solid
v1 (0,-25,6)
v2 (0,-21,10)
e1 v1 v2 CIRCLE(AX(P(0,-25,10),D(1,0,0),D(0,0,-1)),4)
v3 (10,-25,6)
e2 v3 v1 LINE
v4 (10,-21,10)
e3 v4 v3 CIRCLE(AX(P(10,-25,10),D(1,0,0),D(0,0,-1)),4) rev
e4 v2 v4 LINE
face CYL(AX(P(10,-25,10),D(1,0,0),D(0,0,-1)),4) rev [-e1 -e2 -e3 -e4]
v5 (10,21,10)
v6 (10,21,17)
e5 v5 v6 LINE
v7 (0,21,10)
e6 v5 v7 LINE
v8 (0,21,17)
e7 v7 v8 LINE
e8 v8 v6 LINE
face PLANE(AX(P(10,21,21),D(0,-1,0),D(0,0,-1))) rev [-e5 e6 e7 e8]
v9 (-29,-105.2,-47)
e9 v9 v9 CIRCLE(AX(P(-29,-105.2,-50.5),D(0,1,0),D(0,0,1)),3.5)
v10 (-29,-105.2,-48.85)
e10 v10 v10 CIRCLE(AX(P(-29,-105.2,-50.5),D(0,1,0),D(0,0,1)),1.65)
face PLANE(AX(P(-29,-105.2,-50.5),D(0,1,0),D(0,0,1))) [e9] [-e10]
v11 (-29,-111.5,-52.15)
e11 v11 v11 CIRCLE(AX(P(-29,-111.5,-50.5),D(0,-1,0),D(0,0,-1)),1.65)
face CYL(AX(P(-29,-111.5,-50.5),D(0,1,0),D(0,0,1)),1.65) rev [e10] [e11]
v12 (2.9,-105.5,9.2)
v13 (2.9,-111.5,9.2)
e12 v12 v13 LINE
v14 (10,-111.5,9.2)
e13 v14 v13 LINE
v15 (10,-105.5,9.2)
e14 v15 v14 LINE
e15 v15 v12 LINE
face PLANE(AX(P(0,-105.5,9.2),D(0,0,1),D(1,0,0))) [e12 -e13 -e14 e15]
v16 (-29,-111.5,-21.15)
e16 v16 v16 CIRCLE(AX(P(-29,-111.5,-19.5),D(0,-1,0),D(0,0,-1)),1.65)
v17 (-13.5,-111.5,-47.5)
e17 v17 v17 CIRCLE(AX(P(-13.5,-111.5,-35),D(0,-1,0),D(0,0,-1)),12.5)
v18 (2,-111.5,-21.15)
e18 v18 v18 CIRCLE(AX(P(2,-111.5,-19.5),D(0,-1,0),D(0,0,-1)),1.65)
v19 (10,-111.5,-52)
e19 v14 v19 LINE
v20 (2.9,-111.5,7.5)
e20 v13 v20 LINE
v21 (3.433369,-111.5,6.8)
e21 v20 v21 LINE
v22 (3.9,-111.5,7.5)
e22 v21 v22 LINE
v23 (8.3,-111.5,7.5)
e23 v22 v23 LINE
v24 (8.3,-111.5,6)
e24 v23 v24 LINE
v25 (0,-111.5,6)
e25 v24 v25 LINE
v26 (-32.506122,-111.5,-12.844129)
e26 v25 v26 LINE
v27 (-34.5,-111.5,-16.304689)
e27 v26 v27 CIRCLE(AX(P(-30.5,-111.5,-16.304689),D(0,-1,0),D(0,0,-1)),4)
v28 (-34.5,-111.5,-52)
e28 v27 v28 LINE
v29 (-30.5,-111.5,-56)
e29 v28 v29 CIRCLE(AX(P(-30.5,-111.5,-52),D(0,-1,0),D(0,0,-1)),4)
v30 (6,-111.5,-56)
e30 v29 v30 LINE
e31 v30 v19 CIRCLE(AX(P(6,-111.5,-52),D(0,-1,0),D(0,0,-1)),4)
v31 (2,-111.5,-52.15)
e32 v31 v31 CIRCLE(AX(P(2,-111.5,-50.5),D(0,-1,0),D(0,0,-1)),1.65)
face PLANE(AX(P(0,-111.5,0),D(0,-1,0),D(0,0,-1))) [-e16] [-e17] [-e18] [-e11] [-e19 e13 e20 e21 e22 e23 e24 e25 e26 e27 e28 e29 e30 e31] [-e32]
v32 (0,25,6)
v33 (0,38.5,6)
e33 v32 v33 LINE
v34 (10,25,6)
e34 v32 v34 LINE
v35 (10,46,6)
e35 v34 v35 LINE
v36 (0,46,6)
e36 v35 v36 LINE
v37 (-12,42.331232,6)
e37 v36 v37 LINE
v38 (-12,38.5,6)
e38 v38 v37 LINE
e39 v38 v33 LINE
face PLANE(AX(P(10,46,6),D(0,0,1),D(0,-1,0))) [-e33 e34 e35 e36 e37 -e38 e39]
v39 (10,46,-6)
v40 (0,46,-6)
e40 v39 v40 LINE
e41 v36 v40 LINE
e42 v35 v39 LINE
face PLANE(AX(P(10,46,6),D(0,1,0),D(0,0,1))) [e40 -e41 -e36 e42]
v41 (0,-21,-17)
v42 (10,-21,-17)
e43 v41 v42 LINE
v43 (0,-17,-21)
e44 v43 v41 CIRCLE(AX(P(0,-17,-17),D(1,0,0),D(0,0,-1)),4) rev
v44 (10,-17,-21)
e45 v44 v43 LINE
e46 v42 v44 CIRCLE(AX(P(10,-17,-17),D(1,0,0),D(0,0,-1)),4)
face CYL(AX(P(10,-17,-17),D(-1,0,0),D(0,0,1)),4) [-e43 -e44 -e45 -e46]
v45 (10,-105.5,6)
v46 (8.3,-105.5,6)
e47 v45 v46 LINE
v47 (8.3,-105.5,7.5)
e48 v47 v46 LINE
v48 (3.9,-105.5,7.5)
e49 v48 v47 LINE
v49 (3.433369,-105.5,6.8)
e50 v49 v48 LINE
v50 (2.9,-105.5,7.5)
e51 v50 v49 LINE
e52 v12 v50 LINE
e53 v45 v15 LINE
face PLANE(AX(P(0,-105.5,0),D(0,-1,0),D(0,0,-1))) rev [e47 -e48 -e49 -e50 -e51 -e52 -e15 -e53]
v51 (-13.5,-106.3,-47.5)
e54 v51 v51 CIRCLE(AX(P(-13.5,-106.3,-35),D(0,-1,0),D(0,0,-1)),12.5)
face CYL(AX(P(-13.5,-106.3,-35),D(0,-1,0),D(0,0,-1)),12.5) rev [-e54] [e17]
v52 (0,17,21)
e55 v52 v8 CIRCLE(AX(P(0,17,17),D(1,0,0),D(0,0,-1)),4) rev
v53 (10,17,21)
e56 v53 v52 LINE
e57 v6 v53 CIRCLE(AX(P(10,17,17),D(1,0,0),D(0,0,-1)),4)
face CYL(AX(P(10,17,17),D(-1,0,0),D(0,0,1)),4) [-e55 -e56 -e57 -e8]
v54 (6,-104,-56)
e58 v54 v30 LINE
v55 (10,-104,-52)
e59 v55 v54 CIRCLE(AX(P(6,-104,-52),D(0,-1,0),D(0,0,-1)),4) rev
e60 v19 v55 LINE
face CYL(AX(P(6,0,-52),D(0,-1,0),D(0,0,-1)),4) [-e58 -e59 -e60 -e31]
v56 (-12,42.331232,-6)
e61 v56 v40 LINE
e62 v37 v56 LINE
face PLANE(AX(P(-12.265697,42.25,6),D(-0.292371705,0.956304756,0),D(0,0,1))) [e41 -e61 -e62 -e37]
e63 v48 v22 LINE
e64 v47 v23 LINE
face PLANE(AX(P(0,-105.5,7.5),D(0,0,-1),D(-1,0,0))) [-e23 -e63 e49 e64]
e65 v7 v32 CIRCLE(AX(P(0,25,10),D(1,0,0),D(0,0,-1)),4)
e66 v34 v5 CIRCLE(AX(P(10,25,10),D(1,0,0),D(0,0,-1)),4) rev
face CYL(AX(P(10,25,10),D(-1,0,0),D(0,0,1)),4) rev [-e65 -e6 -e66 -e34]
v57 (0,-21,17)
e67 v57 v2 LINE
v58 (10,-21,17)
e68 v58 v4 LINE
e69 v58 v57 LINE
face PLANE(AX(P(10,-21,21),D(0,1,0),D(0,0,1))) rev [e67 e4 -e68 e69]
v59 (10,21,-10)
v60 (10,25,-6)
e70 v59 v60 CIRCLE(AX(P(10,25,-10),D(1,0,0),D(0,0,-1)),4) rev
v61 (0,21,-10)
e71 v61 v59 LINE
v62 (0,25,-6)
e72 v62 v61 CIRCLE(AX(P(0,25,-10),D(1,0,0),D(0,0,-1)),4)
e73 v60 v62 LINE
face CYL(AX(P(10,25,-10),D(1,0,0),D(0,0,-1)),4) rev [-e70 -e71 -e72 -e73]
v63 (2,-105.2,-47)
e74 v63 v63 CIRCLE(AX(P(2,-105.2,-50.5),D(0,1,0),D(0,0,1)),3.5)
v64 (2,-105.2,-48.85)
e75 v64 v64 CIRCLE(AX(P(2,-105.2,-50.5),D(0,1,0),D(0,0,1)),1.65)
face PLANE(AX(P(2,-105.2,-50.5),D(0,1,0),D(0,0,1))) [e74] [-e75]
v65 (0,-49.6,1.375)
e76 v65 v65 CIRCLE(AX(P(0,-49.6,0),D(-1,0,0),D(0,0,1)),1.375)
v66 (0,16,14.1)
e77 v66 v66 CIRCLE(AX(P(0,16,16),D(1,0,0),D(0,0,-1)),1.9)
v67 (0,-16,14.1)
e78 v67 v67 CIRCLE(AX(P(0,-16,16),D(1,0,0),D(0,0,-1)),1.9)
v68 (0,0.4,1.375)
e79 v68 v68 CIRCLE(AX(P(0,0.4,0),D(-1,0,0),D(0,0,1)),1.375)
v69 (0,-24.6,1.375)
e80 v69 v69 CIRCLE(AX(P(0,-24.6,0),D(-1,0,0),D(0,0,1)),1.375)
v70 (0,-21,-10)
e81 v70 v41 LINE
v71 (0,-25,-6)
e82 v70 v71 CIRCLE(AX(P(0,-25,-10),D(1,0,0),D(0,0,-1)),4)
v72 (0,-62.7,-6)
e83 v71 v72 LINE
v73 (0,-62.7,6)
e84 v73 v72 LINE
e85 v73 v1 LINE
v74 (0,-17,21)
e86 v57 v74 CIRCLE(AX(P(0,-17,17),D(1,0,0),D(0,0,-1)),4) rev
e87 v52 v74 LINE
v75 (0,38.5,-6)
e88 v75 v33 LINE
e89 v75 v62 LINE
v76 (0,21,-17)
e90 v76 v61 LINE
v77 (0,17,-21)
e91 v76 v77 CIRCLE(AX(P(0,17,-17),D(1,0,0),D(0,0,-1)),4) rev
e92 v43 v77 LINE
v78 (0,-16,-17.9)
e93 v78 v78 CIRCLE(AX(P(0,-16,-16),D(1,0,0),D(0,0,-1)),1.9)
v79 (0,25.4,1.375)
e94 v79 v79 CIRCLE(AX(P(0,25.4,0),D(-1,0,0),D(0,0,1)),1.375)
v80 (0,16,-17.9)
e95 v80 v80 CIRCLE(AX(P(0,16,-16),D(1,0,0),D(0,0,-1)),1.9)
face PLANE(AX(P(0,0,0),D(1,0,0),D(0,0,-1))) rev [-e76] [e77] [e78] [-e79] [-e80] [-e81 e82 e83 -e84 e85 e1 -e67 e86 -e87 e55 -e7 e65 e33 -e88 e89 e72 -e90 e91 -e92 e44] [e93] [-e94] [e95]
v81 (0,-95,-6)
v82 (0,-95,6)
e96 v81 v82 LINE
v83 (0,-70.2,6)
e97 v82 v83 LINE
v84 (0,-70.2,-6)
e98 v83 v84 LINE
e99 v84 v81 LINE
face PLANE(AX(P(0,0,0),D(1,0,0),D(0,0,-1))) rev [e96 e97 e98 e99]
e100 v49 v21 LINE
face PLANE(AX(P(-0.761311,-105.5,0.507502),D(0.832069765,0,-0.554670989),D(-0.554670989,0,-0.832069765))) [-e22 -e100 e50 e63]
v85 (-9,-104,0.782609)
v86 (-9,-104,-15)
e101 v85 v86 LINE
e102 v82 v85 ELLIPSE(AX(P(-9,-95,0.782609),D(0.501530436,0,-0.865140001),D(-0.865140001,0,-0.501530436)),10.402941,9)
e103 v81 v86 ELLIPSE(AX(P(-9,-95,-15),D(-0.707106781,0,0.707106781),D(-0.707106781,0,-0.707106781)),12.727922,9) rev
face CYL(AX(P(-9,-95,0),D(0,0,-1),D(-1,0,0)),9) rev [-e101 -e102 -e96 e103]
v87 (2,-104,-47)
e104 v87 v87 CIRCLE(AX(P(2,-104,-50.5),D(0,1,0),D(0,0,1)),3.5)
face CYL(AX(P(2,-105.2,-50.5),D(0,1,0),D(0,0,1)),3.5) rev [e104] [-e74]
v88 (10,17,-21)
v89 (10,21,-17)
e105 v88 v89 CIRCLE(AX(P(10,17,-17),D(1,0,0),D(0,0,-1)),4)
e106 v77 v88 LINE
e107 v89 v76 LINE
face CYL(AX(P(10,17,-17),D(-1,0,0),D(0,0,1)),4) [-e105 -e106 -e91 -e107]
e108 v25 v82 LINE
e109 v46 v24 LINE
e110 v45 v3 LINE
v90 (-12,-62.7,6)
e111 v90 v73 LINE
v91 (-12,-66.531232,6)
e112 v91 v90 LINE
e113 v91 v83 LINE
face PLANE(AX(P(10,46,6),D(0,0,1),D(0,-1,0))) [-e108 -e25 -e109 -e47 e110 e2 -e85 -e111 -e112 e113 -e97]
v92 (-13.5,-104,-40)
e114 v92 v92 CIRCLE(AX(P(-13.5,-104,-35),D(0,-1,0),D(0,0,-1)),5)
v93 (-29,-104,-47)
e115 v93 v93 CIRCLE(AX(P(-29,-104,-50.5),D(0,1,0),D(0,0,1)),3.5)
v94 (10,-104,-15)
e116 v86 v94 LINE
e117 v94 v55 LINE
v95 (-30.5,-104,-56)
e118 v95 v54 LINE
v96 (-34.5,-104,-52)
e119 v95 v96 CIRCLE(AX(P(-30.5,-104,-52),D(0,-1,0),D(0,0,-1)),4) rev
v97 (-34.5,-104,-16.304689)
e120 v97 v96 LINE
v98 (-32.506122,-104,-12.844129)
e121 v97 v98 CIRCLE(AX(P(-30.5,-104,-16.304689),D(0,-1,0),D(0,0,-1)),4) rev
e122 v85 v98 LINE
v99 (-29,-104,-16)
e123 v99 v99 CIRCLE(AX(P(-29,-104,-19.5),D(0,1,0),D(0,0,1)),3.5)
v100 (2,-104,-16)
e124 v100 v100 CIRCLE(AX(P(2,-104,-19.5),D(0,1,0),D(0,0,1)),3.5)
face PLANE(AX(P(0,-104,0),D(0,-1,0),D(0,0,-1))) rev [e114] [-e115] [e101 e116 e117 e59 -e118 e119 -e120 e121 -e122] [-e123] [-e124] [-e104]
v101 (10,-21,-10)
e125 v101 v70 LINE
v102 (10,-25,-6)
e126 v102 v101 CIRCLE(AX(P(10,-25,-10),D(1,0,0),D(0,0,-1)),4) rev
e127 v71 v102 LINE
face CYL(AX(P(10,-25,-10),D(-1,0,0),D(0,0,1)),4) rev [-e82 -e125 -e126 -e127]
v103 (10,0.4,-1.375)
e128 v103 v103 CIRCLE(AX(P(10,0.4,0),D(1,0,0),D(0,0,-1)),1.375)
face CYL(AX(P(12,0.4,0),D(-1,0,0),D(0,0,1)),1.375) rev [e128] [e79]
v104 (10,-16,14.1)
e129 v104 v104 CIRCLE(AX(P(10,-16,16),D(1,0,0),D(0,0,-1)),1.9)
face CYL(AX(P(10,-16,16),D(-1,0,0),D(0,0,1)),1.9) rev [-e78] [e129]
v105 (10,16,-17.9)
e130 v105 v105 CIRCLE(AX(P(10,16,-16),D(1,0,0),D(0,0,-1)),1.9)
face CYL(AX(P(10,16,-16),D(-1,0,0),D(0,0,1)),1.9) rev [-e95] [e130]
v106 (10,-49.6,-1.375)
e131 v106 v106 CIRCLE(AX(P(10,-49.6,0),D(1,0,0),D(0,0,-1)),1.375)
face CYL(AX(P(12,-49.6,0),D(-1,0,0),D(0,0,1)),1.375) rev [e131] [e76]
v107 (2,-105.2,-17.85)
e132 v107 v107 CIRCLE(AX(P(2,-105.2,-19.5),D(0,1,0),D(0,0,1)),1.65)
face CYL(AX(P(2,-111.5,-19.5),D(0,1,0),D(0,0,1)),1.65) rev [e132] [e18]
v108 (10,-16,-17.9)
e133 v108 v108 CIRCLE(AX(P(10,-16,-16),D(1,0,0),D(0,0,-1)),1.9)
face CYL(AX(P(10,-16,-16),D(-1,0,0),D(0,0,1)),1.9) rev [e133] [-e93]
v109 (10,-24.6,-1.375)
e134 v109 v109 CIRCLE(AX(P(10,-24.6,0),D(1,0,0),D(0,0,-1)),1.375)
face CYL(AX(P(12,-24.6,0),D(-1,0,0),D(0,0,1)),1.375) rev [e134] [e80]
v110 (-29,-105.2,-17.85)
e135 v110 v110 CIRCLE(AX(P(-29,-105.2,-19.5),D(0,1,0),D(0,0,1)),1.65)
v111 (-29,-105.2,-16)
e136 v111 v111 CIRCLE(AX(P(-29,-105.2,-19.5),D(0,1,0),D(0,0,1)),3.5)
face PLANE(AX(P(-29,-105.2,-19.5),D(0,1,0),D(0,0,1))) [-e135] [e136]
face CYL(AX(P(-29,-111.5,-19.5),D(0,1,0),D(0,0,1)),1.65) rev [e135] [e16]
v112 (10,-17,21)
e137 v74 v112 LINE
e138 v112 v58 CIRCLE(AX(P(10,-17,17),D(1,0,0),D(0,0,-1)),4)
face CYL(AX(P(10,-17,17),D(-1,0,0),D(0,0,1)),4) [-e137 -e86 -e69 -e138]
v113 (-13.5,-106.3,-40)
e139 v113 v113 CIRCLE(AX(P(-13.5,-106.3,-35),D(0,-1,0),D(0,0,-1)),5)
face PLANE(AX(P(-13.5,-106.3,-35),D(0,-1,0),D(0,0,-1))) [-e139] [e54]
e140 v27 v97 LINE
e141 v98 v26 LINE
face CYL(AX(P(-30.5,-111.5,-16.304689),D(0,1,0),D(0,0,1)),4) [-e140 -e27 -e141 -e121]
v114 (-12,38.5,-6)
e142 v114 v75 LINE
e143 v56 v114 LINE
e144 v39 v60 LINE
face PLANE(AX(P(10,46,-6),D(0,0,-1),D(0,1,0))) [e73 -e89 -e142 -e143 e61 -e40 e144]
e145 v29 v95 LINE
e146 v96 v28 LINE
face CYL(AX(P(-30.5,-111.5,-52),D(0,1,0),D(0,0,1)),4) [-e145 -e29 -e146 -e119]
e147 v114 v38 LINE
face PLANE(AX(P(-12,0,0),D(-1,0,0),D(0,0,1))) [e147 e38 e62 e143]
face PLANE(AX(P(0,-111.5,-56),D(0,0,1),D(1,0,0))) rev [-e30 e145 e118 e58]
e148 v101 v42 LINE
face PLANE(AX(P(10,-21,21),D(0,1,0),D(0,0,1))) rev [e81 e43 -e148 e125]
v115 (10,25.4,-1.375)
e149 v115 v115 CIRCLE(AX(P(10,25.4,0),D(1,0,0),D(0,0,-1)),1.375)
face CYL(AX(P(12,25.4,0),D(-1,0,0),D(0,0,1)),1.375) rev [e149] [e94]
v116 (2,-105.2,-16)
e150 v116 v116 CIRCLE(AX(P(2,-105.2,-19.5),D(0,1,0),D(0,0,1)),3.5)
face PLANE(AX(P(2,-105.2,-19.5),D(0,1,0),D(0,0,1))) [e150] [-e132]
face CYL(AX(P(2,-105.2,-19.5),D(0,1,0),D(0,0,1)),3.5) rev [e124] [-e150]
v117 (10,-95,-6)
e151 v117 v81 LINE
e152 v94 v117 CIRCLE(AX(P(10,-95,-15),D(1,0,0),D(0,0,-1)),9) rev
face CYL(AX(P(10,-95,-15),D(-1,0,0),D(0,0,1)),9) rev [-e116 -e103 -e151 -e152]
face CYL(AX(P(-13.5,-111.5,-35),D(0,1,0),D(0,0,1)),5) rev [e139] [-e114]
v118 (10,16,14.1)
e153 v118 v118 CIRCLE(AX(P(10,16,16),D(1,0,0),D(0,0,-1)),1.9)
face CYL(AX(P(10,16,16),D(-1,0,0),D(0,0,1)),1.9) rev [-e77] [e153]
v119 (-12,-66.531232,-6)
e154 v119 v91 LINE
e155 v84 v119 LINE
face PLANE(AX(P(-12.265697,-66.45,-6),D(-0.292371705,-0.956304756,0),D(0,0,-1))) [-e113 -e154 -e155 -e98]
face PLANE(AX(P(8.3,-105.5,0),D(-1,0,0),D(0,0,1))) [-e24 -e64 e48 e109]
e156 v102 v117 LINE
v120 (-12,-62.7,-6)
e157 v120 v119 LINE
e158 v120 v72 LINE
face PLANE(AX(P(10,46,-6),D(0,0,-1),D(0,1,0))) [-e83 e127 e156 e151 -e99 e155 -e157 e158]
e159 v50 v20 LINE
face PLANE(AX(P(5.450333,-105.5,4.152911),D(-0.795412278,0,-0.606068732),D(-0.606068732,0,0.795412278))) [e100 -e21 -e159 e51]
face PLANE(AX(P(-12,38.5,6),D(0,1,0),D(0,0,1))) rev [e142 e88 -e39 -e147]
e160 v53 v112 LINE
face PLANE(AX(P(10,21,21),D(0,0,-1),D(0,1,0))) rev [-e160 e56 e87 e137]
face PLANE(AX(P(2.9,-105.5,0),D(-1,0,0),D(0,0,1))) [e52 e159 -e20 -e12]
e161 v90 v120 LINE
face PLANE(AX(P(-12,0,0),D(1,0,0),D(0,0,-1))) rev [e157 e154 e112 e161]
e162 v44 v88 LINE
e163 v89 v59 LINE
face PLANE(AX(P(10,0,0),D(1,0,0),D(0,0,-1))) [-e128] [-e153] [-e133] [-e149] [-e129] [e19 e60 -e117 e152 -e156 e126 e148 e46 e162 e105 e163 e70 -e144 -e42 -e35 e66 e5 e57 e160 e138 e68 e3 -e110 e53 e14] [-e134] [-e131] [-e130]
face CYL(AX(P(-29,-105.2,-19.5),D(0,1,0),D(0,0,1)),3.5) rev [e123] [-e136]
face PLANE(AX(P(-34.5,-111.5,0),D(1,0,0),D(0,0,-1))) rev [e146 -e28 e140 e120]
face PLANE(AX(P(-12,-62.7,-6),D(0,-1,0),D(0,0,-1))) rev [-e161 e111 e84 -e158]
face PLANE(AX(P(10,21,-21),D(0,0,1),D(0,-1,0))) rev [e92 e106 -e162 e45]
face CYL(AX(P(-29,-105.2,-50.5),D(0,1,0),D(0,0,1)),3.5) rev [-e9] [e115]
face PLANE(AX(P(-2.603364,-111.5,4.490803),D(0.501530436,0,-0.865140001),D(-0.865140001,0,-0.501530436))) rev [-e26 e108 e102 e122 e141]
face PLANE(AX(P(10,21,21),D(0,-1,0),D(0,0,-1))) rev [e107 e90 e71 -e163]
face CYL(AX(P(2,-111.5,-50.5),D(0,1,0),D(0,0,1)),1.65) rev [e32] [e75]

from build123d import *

# Parameters (mm, degrees)
SKETCH1_W           = 42
SKETCH1_H           = 42
SKETCH1_R           = 1.9
BOSS_EXTRUDE1_DEPTH = 10
SKETCH2_W           = 12
SKETCH2_H           = 150
BOSS_EXTRUDE2_DEPTH = 10
SKETCH3_W           = 12
SKETCH3_H           = 3.75
BOSS_EXTRUDE3_DEPTH = 12
CHAMFER1_SIZE       = 3.75
CHAMFER1_SIZE_2     = 12.265697319
SKETCH4_R           = 1.375
CUT_EXTRUDE1_DEPTH  = 12
SKETCH5_W           = 42
SKETCH5_H           = 42
SKETCH5_R           = 1.65
SKETCH5_R_2         = 5
BOSS_EXTRUDE4_DEPTH = 7.5
SKETCH6_R           = 12.5
CUT_EXTRUDE2_DEPTH  = 5.2
FILLET1_R           = 4
FILLET2_R           = 9
SKETCH8_R           = 3.5
CUT_EXTRUDE4_DEPTH  = 1.2
BOSS_EXTRUDE7_DEPTH = 6


with BuildPart() as part:
    # Sketch1 → Boss-Extrude1 (new body)
    with BuildSketch(Plane(origin=(0, 0, 0), x_dir=(0, 0, -1), z_dir=(1, 0, 0))):
        Rectangle(SKETCH1_W, SKETCH1_H)
        with Locations((16, -16)):
            Circle(SKETCH1_R, mode=Mode.SUBTRACT)
        with Locations((-16, -16)):
            Circle(SKETCH1_R, mode=Mode.SUBTRACT)
        with Locations((-16, 16)):
            Circle(SKETCH1_R, mode=Mode.SUBTRACT)
        with Locations((16, 16)):
            Circle(SKETCH1_R, mode=Mode.SUBTRACT)
    extrude(amount=BOSS_EXTRUDE1_DEPTH)

    # Sketch2 → Boss-Extrude2 (add)
    with BuildSketch(Plane.ZY):
        with Locations((0, -29)):
            Rectangle(SKETCH2_W, SKETCH2_H)
    extrude(amount=-BOSS_EXTRUDE2_DEPTH)

    # Sketch3 → Boss-Extrude3 (add)
    with BuildSketch(Plane.ZY):
        with Locations((0, 40.375)):
            Rectangle(SKETCH3_W, SKETCH3_H)
        with Locations((0, -64.575)):
            Rectangle(SKETCH3_W, SKETCH3_H)
    extrude(amount=BOSS_EXTRUDE3_DEPTH)

    # Chamfer1
    # the kernel refuses this chamfer: 12.265697319, 3.75 mm, written as the material it adds along each edge
    with BuildSketch(Plane(origin=(0, 42.25, -6), x_dir=(0.11964200288050787, 0.9928170985366542, 0), z_dir=(0, 0, 1))) as chamfer1_piece_1_section:
        Polygon((CHAMFER1_SIZE * 0.992817098537, CHAMFER1_SIZE * 0.119642002881), (-CHAMFER1_SIZE_2 * 0.119642002884, CHAMFER1_SIZE_2 * 0.992817098562), (0, 0), align=None)
    chamfer1_piece_1 = extrude(amount=12, mode=Mode.PRIVATE)
    chamfer1_piece_1 = split(chamfer1_piece_1, bisect_by=Plane(origin=(-4.172539525, 46, 0), z_dir=(0, -1, 0)), keep=Keep.TOP, mode=Mode.PRIVATE)
    chamfer1_piece_1 = split(chamfer1_piece_1, bisect_by=Plane(origin=(-12, 43.383581674, 0), z_dir=(1, 0, 0)), keep=Keep.TOP, mode=Mode.PRIVATE)
    add(chamfer1_piece_1)
    with BuildSketch(Plane(origin=(0, -66.45, -6), x_dir=(0.11964200288050787, -0.9928170985366542, 0), z_dir=(0, 0, 1))) as chamfer1_piece_2_section:
        Polygon((CHAMFER1_SIZE * 0.992817098537, -CHAMFER1_SIZE * 0.119642002881), (-CHAMFER1_SIZE_2 * 0.119642002884, -CHAMFER1_SIZE_2 * 0.992817098562), (0, 0), align=None)
    chamfer1_piece_2 = extrude(amount=12, mode=Mode.PRIVATE)
    chamfer1_piece_2 = split(chamfer1_piece_2, bisect_by=Plane(origin=(-12, -67.58994207, 0), z_dir=(1, 0, 0)), keep=Keep.TOP, mode=Mode.PRIVATE)
    add(chamfer1_piece_2)

    # Sketch4 → Cut-Extrude1 (cut)
    with BuildSketch(Plane.ZY):
        with Locations((0, 25.4)):
            Circle(SKETCH4_R)
        with Locations((0, 0.4)):
            Circle(SKETCH4_R)
        with Locations((0, -24.6)):
            Circle(SKETCH4_R)
        with Locations((0, -49.6)):
            Circle(SKETCH4_R)
    extrude(amount=-CUT_EXTRUDE1_DEPTH, mode=Mode.SUBTRACT)

    # Sketch5 → Boss-Extrude4 (add)
    # profile 1 of 2: a face of its own
    with BuildSketch(Plane.XZ.offset(104)):
        Polygon((10, -56), (10, 6), (0, 6), (-34.5, -14), (7.5, -14), (7.5, -56), align=None)
    # profile 2 of 2: a face of its own
    with BuildSketch(Plane.XZ.offset(104)):
        with Locations((-13.5, -35)):
            Rectangle(SKETCH5_W, SKETCH5_H)
        with Locations(Location((-29, -50.5, 0), (0, 0, 270))):
            Circle(SKETCH5_R, mode=Mode.SUBTRACT)
        with Locations(Location((-13.5, -35, 0), (0, 0, 270))):
            Circle(SKETCH5_R_2, mode=Mode.SUBTRACT)
        with Locations(Location((2, -50.5, 0), (0, 0, 270))):
            Circle(SKETCH5_R, mode=Mode.SUBTRACT)
        with Locations(Location((-29, -19.5, 0), (0, 0, 270))):
            Circle(SKETCH5_R, mode=Mode.SUBTRACT)
        with Locations(Location((2, -19.5, 0), (0, 0, 270))):
            Circle(SKETCH5_R, mode=Mode.SUBTRACT)
    extrude(amount=BOSS_EXTRUDE4_DEPTH)

    # Sketch6 → Cut-Extrude2 (cut)
    with BuildSketch(Plane.XZ.offset(111.5)):
        with Locations(Location((-13.5, -35, 0), (0, 0, 270))):
            Circle(SKETCH6_R)
    extrude(amount=-CUT_EXTRUDE2_DEPTH, mode=Mode.SUBTRACT)

    # Fillet1
    fillet1_edges = [part.edges().sort_by_distance(p)[0] for p in [
        (-34.5, -107.75, -56),
        (10, -107.75, -56),
        (-34.5, -107.75, -14),
        (5, -21, 6),
        (5, -21, -6),
        (5, 21, -6),
        (5, 21, 6),
        (5, -21, -21),
        (5, -21, 21),
        (5, 21, 21),
        (5, 21, -21),
    ]]
    fillet(fillet1_edges, radius=FILLET1_R)

    # Fillet2
    fillet2_edges = [part.edges().sort_by_distance(p)[0] for p in [
        (5, -104, -6),
        (0, -104, 0),
    ]]
    fillet(fillet2_edges, radius=FILLET2_R)

    # Sketch8 → Cut-Extrude4 (cut)
    with BuildSketch(Plane(origin=(0, -104, 0), x_dir=(1, 0, 0), z_dir=(0, 1, 0))):
        with Locations(Location((-29, 50.5, 0), (0, 0, 270))):
            Circle(SKETCH8_R)
        with Locations(Location((2, 50.5, 0), (0, 0, 270))):
            Circle(SKETCH8_R)
        with Locations(Location((2, 19.5, 0), (0, 0, 270))):
            Circle(SKETCH8_R)
        with Locations(Location((-29, 19.5, 0), (0, 0, 270))):
            Circle(SKETCH8_R)
    extrude(amount=-CUT_EXTRUDE4_DEPTH, mode=Mode.SUBTRACT)

    # Sketch11 → Boss-Extrude7 (add)
    with BuildSketch(Plane.XZ.offset(111.5)):
        Polygon((8.3, 6), (10, 6), (10, 9.2), (2.9, 9.2), (2.9, 7.5), (3.9, 7.5), (8.3, 7.5), align=None)
        Polygon((3.9, 7.5), (2.9, 7.5), (3.433368825, 6.8), align=None)
    extrude(amount=-BOSS_EXTRUDE7_DEPTH)


solid = part.part
